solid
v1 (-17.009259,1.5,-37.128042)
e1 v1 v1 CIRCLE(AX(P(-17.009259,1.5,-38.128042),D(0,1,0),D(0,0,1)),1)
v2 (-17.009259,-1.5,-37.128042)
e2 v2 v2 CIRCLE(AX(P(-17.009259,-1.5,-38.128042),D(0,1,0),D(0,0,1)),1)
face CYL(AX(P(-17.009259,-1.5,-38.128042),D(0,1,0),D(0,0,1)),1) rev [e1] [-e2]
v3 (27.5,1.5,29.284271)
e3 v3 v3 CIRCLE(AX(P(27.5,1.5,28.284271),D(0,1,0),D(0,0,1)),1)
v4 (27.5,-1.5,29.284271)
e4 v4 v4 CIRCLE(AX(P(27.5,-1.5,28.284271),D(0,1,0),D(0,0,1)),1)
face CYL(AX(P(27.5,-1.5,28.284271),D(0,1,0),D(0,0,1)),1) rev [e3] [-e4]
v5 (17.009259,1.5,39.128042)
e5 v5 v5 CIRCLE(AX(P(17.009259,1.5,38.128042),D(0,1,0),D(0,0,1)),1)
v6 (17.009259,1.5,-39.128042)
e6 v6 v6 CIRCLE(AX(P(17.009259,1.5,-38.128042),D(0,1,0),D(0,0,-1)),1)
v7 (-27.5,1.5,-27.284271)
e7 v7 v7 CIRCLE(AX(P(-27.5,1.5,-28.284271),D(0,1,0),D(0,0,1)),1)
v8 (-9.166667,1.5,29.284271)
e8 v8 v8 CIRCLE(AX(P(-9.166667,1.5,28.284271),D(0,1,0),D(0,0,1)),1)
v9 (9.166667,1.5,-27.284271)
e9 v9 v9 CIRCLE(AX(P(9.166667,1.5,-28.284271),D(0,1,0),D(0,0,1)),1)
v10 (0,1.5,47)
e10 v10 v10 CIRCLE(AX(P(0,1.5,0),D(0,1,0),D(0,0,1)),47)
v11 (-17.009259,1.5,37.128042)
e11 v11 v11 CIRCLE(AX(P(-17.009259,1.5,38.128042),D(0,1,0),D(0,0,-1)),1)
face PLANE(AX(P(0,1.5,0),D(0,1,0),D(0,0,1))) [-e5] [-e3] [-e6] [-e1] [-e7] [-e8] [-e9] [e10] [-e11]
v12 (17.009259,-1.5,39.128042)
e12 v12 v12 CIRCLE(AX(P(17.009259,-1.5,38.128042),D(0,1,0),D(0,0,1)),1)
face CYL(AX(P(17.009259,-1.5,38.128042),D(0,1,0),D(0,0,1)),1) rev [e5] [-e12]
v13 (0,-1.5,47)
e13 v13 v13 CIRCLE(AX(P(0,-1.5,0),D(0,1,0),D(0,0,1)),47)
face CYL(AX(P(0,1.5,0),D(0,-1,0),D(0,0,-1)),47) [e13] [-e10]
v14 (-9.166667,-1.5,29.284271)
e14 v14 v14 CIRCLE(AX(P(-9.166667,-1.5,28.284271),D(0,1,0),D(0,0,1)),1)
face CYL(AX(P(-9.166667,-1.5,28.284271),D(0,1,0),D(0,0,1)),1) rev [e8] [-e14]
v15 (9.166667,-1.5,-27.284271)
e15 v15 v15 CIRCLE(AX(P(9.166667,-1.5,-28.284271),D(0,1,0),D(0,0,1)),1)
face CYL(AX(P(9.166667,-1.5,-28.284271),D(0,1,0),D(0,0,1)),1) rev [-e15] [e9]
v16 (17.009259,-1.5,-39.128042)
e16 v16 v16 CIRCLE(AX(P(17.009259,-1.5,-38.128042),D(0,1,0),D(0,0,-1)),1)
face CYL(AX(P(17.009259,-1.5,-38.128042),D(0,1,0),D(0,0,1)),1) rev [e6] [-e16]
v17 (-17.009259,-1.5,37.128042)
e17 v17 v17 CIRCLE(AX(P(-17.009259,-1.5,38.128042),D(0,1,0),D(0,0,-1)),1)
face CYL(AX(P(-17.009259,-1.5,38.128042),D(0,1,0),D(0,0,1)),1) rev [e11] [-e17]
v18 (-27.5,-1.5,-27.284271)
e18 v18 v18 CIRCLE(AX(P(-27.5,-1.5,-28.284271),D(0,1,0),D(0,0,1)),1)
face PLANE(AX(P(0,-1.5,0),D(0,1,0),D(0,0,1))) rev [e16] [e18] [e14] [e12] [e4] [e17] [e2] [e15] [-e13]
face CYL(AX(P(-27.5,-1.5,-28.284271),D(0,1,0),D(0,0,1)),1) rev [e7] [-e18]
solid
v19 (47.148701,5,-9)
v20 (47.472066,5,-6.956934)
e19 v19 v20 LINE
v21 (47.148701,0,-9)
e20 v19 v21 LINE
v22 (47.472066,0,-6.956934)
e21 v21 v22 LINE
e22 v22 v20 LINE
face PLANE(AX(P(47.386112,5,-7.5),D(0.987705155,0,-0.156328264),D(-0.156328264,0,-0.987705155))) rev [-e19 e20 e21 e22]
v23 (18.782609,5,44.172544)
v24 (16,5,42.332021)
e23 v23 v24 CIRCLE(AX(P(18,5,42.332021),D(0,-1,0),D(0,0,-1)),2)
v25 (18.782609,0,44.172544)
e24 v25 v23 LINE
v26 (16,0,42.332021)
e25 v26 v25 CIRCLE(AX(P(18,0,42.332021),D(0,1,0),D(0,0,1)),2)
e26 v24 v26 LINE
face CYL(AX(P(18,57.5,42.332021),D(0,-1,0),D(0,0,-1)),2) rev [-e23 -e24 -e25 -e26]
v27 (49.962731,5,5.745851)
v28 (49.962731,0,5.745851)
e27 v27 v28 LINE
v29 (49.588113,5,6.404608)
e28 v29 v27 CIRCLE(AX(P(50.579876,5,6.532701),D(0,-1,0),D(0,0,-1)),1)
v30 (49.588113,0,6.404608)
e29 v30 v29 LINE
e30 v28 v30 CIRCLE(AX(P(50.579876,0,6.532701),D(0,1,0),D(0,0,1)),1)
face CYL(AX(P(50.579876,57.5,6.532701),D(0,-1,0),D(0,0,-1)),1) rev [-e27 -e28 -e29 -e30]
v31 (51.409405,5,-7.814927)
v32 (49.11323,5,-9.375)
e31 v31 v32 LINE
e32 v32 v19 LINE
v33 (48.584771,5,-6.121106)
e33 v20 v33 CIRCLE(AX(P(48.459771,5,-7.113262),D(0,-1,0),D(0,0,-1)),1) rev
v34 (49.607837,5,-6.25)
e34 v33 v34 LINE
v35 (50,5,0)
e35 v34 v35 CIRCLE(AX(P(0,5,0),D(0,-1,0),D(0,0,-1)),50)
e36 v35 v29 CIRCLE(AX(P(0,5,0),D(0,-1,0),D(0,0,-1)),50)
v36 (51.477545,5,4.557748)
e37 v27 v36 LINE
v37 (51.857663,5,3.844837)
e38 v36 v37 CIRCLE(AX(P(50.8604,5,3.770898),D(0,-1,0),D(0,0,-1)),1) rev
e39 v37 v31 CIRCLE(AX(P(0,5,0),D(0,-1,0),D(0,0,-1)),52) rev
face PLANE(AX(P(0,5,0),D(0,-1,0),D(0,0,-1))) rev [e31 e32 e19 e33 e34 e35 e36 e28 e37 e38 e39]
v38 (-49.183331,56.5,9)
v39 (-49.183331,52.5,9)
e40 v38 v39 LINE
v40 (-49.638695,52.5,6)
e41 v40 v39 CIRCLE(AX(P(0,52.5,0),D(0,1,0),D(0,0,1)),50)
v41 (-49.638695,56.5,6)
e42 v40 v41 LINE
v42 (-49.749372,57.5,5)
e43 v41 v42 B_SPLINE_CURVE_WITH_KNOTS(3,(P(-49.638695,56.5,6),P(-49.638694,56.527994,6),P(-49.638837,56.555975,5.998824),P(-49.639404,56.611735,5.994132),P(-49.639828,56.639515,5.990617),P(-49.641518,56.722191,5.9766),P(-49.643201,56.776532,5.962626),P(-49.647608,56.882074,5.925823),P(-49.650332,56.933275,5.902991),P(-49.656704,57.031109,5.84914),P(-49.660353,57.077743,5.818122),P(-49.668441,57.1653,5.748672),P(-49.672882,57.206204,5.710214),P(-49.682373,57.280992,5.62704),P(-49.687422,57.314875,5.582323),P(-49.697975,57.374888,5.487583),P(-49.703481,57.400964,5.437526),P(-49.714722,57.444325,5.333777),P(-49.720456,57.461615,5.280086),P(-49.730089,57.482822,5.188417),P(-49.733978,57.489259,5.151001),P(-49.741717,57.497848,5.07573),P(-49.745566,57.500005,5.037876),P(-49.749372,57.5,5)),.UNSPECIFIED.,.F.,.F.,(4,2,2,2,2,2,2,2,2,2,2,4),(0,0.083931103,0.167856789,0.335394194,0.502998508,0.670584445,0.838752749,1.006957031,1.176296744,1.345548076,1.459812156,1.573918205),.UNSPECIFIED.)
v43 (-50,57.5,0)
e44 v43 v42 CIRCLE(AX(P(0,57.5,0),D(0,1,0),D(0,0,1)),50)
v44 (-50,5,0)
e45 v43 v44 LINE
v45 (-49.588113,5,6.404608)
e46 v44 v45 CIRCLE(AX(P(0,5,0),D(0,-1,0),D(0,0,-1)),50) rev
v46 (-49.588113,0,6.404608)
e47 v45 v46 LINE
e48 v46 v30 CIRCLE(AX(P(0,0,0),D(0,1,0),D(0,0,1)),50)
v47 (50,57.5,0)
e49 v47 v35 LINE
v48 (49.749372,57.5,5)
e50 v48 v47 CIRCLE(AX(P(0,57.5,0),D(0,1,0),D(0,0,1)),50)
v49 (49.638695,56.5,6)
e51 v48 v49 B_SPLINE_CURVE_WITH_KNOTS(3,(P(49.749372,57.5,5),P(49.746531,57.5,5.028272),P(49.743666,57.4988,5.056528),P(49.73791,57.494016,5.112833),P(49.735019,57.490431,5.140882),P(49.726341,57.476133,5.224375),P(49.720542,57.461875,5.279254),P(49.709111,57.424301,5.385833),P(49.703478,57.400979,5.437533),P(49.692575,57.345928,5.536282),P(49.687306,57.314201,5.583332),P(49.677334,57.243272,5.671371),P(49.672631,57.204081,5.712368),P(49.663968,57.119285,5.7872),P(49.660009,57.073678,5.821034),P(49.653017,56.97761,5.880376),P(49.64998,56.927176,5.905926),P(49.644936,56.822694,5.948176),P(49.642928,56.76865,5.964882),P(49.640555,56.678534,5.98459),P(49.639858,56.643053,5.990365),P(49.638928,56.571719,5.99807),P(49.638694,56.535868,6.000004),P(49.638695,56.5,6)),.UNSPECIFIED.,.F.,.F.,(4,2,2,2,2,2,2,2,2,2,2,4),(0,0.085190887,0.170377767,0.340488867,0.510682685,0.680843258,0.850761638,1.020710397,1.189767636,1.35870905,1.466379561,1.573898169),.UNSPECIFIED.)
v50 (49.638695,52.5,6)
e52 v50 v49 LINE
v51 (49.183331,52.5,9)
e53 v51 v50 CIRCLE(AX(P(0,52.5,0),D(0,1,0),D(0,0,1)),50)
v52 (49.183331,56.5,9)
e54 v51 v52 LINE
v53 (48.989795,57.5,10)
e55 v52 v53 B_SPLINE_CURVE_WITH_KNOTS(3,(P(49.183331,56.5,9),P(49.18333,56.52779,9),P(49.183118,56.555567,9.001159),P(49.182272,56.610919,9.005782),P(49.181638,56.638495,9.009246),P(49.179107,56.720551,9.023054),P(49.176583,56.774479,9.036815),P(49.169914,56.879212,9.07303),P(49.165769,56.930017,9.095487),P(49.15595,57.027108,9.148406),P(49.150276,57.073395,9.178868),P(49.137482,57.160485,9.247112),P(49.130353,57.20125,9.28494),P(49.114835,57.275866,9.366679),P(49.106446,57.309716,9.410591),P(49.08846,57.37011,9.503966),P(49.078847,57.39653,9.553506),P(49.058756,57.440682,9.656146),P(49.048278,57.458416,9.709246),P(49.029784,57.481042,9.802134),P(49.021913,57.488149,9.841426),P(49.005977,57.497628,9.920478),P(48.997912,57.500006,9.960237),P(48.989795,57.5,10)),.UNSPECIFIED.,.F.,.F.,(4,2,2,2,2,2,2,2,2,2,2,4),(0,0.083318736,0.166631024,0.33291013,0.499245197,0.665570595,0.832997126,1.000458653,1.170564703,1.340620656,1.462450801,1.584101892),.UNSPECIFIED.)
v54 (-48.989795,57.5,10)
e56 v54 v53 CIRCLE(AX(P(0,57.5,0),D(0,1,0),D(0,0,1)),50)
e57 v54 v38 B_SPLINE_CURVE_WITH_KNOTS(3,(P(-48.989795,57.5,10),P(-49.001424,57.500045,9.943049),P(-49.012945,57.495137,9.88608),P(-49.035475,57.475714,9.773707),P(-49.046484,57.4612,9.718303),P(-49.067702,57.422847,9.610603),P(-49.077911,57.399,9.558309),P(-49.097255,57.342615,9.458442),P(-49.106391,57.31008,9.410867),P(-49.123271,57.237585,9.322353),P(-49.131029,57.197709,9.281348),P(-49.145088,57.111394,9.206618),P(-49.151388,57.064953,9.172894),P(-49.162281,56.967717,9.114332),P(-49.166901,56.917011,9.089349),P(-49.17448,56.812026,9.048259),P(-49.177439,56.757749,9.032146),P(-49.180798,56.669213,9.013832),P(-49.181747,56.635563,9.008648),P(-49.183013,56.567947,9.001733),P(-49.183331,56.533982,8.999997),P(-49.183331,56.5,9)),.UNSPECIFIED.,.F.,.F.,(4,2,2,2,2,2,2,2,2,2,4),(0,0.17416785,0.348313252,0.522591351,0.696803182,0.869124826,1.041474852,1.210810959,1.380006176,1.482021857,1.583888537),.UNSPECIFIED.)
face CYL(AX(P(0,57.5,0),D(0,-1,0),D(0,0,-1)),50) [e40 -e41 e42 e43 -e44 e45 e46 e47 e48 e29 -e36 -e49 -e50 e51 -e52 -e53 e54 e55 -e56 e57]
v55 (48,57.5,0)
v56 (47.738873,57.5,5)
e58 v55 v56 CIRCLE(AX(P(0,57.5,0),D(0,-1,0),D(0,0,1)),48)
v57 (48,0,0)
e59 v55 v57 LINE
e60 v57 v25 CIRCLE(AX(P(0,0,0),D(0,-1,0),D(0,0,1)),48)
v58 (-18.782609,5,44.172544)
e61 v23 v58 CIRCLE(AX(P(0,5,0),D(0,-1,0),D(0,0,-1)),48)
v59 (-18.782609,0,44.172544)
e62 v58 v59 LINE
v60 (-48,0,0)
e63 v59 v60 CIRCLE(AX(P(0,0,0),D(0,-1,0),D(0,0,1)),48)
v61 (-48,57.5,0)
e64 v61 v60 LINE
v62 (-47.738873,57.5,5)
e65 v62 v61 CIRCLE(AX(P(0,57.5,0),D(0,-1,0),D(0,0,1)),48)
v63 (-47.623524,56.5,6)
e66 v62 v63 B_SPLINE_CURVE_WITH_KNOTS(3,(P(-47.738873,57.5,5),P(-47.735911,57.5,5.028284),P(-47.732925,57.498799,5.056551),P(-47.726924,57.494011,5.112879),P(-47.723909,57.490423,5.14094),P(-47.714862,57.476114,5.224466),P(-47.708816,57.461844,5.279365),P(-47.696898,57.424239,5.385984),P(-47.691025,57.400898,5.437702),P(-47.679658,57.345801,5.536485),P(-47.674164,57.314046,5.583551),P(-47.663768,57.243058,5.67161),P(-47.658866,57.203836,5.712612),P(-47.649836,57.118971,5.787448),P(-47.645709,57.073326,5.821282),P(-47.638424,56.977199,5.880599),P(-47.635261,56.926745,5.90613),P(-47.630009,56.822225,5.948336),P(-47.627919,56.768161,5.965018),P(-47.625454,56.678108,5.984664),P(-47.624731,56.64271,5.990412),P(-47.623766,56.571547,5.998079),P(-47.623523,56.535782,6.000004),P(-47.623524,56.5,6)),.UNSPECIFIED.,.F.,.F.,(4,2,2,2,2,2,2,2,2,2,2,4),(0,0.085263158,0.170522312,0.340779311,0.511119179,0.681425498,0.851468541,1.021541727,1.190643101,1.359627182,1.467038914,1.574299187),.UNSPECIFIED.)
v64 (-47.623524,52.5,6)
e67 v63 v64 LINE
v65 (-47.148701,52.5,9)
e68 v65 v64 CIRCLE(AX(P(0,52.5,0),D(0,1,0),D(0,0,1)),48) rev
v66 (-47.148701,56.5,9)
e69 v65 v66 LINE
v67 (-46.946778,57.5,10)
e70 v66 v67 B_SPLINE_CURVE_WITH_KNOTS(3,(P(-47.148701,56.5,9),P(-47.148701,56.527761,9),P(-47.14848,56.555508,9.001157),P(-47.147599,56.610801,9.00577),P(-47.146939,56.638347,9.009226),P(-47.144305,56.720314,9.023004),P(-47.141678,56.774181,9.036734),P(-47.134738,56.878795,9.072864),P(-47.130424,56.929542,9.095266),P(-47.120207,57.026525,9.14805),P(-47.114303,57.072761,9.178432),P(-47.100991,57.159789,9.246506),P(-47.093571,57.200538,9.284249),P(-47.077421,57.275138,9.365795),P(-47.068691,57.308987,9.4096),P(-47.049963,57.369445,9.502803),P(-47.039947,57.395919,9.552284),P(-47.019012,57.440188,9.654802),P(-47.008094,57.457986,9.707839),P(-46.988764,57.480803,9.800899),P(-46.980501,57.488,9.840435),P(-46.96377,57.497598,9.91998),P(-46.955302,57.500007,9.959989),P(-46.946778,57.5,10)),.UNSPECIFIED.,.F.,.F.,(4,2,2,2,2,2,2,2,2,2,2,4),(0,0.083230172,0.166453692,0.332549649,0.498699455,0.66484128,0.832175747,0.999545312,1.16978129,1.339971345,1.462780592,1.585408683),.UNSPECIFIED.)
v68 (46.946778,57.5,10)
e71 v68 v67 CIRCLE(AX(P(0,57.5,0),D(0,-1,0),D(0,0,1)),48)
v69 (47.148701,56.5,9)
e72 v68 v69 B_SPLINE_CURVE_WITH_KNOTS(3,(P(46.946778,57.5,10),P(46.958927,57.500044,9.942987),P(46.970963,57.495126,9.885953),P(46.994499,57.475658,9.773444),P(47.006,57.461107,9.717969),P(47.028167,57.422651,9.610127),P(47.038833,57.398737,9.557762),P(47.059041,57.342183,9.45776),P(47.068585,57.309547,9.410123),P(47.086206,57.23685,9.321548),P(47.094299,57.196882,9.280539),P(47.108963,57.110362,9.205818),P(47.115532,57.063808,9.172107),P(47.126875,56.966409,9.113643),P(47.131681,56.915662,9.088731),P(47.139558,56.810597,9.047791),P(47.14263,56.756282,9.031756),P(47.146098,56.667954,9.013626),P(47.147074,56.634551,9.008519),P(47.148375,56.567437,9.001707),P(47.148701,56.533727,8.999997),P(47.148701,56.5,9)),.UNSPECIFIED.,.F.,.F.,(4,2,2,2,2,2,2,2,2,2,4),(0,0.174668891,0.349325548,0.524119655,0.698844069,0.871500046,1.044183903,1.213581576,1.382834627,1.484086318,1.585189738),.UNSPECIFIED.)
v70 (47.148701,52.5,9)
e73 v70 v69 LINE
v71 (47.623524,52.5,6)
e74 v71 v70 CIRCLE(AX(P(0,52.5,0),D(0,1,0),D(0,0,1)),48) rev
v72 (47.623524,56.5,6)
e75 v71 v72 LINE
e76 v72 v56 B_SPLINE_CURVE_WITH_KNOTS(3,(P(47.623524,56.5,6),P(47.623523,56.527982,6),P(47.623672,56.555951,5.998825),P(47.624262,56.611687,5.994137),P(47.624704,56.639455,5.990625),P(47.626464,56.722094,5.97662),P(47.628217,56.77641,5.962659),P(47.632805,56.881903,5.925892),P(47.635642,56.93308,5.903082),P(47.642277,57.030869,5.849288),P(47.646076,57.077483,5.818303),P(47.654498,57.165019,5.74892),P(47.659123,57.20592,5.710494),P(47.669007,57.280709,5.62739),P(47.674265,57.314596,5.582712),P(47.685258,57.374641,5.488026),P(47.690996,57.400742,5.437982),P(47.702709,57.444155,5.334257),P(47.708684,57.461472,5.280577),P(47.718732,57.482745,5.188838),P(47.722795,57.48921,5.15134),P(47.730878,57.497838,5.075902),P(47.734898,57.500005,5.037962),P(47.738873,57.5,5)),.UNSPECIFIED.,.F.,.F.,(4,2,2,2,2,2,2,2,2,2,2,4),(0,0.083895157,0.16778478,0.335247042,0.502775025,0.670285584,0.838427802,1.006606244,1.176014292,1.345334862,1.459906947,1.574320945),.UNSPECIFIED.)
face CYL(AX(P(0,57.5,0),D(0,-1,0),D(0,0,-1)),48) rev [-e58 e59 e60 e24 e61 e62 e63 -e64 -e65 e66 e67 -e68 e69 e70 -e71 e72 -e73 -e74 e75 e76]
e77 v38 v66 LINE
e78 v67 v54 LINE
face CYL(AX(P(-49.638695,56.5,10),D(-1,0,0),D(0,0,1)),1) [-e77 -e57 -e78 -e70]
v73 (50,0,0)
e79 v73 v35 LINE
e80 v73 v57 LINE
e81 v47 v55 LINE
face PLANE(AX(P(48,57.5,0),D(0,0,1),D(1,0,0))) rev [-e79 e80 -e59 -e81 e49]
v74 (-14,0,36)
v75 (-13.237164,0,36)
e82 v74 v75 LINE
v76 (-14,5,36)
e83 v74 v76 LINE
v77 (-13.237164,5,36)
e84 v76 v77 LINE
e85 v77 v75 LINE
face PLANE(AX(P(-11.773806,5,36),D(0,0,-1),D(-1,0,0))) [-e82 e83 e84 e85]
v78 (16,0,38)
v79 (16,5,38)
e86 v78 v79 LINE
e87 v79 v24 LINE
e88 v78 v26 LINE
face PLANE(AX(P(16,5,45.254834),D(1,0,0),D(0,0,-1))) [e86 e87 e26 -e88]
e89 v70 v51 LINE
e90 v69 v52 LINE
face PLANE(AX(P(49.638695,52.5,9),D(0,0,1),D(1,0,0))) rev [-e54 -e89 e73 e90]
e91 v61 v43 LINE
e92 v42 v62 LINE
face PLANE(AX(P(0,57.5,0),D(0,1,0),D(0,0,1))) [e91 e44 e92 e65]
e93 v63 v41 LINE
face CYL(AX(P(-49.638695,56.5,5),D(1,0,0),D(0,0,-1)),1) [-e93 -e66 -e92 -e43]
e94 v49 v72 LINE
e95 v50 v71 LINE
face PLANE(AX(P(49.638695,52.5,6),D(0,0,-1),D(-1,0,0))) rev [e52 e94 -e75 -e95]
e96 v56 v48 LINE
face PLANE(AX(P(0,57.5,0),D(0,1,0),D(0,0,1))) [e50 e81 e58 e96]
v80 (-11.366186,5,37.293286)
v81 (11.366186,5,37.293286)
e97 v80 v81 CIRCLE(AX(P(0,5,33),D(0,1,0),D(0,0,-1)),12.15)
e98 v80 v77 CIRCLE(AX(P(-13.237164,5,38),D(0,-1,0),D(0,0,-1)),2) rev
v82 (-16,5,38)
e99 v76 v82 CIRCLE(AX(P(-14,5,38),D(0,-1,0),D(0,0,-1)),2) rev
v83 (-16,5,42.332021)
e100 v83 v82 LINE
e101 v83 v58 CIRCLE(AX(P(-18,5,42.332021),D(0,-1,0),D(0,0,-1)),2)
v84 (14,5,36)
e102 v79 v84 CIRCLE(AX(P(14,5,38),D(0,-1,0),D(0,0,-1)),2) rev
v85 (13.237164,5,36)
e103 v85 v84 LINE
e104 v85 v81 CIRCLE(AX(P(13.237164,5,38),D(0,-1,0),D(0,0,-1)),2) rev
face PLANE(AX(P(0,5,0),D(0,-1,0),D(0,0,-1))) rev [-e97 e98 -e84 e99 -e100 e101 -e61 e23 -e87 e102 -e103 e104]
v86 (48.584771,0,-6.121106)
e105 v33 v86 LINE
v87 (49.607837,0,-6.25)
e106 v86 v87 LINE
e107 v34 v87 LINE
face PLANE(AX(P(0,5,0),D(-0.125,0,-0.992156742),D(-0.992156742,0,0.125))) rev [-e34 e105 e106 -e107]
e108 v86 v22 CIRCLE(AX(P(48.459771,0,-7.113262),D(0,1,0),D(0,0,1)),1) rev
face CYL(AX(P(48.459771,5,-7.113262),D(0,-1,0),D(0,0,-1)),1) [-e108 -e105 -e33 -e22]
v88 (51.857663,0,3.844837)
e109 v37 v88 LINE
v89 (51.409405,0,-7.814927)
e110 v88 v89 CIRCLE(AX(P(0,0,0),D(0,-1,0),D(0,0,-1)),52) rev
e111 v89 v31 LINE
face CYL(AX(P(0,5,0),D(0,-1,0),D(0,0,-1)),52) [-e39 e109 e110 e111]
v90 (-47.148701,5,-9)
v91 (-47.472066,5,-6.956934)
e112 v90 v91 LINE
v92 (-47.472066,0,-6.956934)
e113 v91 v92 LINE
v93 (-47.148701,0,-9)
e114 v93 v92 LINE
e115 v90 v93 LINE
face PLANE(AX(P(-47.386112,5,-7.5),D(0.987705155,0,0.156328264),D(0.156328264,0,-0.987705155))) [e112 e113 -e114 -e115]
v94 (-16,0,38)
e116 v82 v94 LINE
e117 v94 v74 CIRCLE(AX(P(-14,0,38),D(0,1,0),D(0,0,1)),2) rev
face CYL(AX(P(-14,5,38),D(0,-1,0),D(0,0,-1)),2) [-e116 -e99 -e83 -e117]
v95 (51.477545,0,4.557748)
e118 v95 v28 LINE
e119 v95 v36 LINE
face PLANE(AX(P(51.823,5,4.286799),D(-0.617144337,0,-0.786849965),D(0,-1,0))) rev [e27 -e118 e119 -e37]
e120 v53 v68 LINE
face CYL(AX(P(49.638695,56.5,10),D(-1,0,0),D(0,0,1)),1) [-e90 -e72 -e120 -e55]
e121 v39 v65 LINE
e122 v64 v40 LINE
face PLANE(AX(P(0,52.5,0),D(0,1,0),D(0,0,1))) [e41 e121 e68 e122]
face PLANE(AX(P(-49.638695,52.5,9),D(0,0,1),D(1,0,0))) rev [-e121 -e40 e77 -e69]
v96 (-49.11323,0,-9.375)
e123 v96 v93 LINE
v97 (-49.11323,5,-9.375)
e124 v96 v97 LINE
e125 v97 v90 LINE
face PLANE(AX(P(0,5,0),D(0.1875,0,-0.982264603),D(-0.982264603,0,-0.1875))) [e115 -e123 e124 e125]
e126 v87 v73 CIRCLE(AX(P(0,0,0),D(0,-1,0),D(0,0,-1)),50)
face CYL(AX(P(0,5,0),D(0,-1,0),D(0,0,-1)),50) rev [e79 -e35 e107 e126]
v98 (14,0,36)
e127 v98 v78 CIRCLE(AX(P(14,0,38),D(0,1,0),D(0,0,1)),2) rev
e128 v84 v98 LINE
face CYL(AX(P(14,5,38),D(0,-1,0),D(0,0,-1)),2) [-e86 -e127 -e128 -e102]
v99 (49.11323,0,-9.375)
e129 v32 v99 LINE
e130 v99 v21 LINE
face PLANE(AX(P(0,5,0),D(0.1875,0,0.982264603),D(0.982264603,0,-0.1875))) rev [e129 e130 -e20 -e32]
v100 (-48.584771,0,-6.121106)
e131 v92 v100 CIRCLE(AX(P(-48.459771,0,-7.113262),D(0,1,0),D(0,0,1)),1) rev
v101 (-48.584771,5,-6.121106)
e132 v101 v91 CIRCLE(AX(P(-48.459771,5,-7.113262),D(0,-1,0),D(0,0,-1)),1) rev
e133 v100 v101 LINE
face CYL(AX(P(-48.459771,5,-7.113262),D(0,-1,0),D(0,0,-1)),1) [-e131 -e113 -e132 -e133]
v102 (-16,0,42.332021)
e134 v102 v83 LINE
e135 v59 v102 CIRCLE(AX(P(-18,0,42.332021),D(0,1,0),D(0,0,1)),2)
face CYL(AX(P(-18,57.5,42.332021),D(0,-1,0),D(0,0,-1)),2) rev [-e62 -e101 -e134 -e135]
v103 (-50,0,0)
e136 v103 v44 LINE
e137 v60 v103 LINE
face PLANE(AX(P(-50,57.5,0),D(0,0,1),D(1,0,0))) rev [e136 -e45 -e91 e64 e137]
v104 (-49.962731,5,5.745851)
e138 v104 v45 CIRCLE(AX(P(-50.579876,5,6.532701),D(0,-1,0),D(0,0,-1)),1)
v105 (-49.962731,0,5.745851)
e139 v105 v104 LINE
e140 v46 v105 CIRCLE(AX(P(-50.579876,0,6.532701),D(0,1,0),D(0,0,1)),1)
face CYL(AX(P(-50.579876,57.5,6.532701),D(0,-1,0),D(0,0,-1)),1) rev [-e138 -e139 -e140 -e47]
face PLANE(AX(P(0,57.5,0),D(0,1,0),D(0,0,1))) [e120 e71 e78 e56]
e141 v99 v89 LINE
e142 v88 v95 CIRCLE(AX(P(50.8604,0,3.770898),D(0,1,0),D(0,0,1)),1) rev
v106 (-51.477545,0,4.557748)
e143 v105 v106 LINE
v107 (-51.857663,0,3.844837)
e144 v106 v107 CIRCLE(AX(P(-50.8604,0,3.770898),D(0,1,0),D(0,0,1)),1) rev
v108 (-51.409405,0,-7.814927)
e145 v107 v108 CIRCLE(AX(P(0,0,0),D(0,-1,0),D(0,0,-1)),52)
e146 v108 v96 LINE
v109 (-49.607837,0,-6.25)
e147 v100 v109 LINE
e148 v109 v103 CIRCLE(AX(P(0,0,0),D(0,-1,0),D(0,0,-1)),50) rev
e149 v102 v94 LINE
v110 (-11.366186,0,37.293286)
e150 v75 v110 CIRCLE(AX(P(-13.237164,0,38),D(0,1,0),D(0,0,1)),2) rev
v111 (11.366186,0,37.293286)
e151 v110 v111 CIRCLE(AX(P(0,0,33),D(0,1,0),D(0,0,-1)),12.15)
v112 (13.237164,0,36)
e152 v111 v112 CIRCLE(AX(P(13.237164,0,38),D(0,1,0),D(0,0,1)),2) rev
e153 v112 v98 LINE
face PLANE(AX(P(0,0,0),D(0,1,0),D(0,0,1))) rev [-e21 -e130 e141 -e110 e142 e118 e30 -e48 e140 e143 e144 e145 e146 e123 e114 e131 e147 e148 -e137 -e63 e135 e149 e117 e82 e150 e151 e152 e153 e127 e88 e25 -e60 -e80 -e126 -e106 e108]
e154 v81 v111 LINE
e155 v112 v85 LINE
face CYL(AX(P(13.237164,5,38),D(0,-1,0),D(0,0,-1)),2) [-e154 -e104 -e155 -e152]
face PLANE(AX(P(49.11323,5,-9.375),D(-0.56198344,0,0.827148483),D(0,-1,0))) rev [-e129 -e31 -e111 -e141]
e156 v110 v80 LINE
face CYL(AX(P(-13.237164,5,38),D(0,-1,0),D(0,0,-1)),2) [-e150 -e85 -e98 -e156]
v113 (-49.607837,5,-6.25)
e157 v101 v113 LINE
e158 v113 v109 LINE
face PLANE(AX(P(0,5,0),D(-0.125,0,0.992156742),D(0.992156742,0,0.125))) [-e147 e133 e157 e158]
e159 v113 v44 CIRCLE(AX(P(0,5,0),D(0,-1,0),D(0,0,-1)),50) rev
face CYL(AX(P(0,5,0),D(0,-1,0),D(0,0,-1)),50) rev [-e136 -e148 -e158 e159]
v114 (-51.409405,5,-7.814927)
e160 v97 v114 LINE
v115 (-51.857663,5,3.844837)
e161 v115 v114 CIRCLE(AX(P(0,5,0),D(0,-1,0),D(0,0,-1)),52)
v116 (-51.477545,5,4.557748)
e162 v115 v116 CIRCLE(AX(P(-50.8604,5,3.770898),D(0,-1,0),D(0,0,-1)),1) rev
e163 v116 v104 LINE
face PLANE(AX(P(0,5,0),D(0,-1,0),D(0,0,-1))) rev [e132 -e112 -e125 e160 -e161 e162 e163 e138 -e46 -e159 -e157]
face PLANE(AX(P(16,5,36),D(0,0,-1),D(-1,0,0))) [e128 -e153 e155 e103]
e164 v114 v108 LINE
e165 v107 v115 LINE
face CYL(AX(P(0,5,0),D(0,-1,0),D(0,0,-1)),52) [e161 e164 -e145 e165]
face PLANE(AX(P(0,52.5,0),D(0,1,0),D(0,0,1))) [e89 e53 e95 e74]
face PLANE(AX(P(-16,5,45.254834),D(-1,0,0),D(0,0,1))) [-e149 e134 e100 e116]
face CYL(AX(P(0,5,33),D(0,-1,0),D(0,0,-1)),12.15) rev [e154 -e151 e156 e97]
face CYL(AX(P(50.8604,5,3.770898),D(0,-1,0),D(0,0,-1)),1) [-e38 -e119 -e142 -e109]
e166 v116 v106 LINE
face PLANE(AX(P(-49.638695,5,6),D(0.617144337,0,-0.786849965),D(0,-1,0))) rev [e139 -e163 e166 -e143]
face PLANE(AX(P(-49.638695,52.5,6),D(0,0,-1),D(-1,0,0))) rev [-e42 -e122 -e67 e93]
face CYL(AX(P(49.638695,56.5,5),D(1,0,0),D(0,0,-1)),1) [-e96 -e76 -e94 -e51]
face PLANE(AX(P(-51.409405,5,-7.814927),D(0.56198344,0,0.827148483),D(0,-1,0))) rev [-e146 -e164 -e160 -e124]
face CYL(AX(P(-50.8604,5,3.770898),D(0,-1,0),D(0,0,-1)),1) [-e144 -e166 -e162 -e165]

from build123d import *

# Parameters (mm, degrees)
A_BASE_T_START         = -1.5
A_BASE_T_OUTLINE_R     = 47
A_BASE_T_OUTLINE_R_2   = 1
A_BASE_T_DEPTH         = 3
SHELL_BODY_DEPTH       = 57.5
SKETCH3_W              = 2.489993647
SKETCH3_H              = 3
CLIP_CAVITY_DEPTH      = 5
CLIP_DEPTH             = 5
TOP_CLAMP_DEPTH        = 5
CLIP_CHAMFER_SIZE      = 2
CONTOURING_R           = 1
INTERFACE_CONTOURING_R = 2


with BuildPart() as part:
    # a_base_t: read off the stored shape, not the designer's step
    # a_base_t outline → a_base_t (new body)
    with BuildSketch(Plane(origin=(0, 0, 0), x_dir=(1, 0, 0), z_dir=(0, 1, 0)).offset(A_BASE_T_START)):
        Circle(A_BASE_T_OUTLINE_R)
        with Locations((-17.009259258, -38.128042167)):
            Circle(A_BASE_T_OUTLINE_R_2, mode=Mode.SUBTRACT)
        with Locations((-9.166666665, -28.284271247)):
            Circle(A_BASE_T_OUTLINE_R_2, mode=Mode.SUBTRACT)
        with Locations((17.009259258, -38.128042167)):
            Circle(A_BASE_T_OUTLINE_R_2, mode=Mode.SUBTRACT)
        with Locations((27.5, -28.284271247)):
            Circle(A_BASE_T_OUTLINE_R_2, mode=Mode.SUBTRACT)
        with Locations((-27.5, 28.284271247)):
            Circle(A_BASE_T_OUTLINE_R_2, mode=Mode.SUBTRACT)
        with Locations((-17.009259258, 38.128042167)):
            Circle(A_BASE_T_OUTLINE_R_2, mode=Mode.SUBTRACT)
        with Locations((9.166666665, 28.284271247)):
            Circle(A_BASE_T_OUTLINE_R_2, mode=Mode.SUBTRACT)
        with Locations((17.009259258, 38.128042167)):
            Circle(A_BASE_T_OUTLINE_R_2, mode=Mode.SUBTRACT)
    extrude(amount=A_BASE_T_DEPTH)


with BuildPart() as body_2:
    # Sketch1 → Shell Body (new body)
    with BuildSketch(Plane(origin=(0, 0, 0), x_dir=(1, 0, 0), z_dir=(0, 1, 0))):
        with BuildLine():
            Line((-50, 0), (-48, 0))
            ThreePointArc((-48, 0), (0, -48), (48, 0))
            Line((48, 0), (50, 0))
            ThreePointArc((50, 0), (0, -50), (-50, 0))
        make_face()
    extrude(amount=SHELL_BODY_DEPTH)

    # Sketch3 → Clip Cavity (cut)
    with BuildSketch(Plane(origin=(0, 57.5, 0), x_dir=(1, 0, 0), z_dir=(0, 1, 0))):
        with Locations((48.393697761, -7.5)):
            Rectangle(SKETCH3_W, SKETCH3_H)
        with Locations((-48.393697761, -7.5)):
            Rectangle(SKETCH3_W, SKETCH3_H)
    extrude(amount=-CLIP_CAVITY_DEPTH, mode=Mode.SUBTRACT)

    # Sketch4 → Clip (add)
    with BuildSketch(Plane.XZ):
        with BuildLine():
            Line((47.148700937, -9), (51.077759348, -9.75))
            ThreePointArc((51.077759348, -9.75), (51.969657629, -1.776143553), (51.624242367, 6.24))
            Line((51.624242367, 6.24), (49.638694584, 6))
            ThreePointArc((49.638694584, 6), (49.90959191, 3.005434312), (50, 0))
            ThreePointArc((50, 0), (49.901862962, -3.131145627), (49.607837082, -6.25))
            Line((49.607837082, -6.25), (47.623523599, -6))
            Line((47.623523599, -6), (47.148700937, -9))
        make_face()
        with BuildLine():
            ThreePointArc((-50, 0), (-49.90959191, 3.005434312), (-49.638694584, 6))
            Line((-49.638694584, 6), (-51.624242367, 6.24))
            ThreePointArc((-51.624242367, 6.24), (-51.969657629, -1.776143553), (-51.077759348, -9.75))
            Line((-51.077759348, -9.75), (-47.148700937, -9))
            Line((-47.148700937, -9), (-47.623523599, -6))
            Line((-47.623523599, -6), (-49.607837082, -6.25))
            ThreePointArc((-49.607837082, -6.25), (-49.901862962, -3.131145627), (-50, 0))
        make_face()
    extrude(amount=-CLIP_DEPTH)

    # Sketch5 → Top Clamp (add)
    with BuildSketch(Plane.XZ):
        with BuildLine():
            Line((16, 45.254833996), (16, 36))
            Line((16, 36), (11.773805672, 36))
            ThreePointArc((11.773805672, 36), (0, 45.15), (-11.773805672, 36))
            Line((-11.773805672, 36), (-16, 36))
            Line((-16, 36), (-16, 45.254833996))
            ThreePointArc((-16, 45.254833996), (0, 48), (16, 45.254833996))
        make_face()
    extrude(amount=-TOP_CLAMP_DEPTH)

    # Clip Chamfer
    # the kernel refuses this chamfer: 2 mm, written as the material it takes off along each edge
    with BuildSketch(Plane(origin=(-51.624242367, -5.143365976, 6.24), x_dir=(0.9927738916792685, 0, -0.11999999999999984), z_dir=(0, 1, 0))) as clip_chamfer_piece_1_section:
        with BuildLine():
            Line((CLIP_CHAMFER_SIZE, 0), (0.037062475, 1.962937525))
            ThreePointArc((0.037062475, 1.962937525), (0.009797411, 1.009373468), (0, 0))
            Line((0, 0), (CLIP_CHAMFER_SIZE, 0))
        make_face()
    clip_chamfer_piece_1 = extrude(amount=15.286731952, mode=Mode.PRIVATE)
    clip_chamfer_piece_1 = clip_chamfer_piece_1 - Plane(origin=(0, -5.143365976, 0), x_dir=(1, 0, 0), z_dir=(0, -1, 0)) * Cylinder(50, 39, mode=Mode.PRIVATE)
    add(clip_chamfer_piece_1, mode=Mode.SUBTRACT)
    with BuildSketch(Plane(origin=(-51.077759348, -5.143365976, -9.75), x_dir=(-0.1689236286537023, 0, 0.9856291430768807), z_dir=(0, 1, 0))) as clip_chamfer_piece_2:
        with BuildLine():
            Line((1.963287385, 0), (CLIP_CHAMFER_SIZE * 0.0188777633164, CLIP_CHAMFER_SIZE * 0.999821799148))
            Line((CLIP_CHAMFER_SIZE * 0.0188777633164, CLIP_CHAMFER_SIZE * 0.999821799148), (0, 0))
            ThreePointArc((0, 0), (1.00937855, -0.009259048), (1.963287385, 0))
        make_face()
    extrude(amount=15.286731952, mode=Mode.SUBTRACT)
    with BuildSketch(Plane(origin=(51.077759348, -5.143365976, -9.75), x_dir=(-0.9822646028438573, 0, 0.18749999999999856), z_dir=(0, 1, 0))) as clip_chamfer_piece_3:
        with BuildLine():
            Line((CLIP_CHAMFER_SIZE, 0), (0.037062475, 1.962937525))
            ThreePointArc((0.037062475, 1.962937525), (0.009797411, 1.009373468), (0, 0))
            Line((0, 0), (CLIP_CHAMFER_SIZE, 0))
        make_face()
    extrude(amount=15.286731952, mode=Mode.SUBTRACT)
    with BuildSketch(Plane(origin=(51.624242367, -5.143365976, 6.24), x_dir=(-0.9927738916792685, 0, -0.12000000000000073), z_dir=(0, 1, 0))) as clip_chamfer_piece_4_section:
        with BuildLine():
            Line((CLIP_CHAMFER_SIZE, 0), (0.037062475, -1.962937525))
            ThreePointArc((0.037062475, -1.962937525), (0.009797411, -1.009373468), (0, 0))
            Line((0, 0), (CLIP_CHAMFER_SIZE, 0))
        make_face()
    clip_chamfer_piece_4 = extrude(amount=15.286731952, mode=Mode.PRIVATE)
    clip_chamfer_piece_4 = clip_chamfer_piece_4 - Plane(origin=(0, -5.143365976, 0), x_dir=(1, 0, 0), z_dir=(0, -1, 0)) * Cylinder(50, 39, mode=Mode.PRIVATE)
    add(clip_chamfer_piece_4, mode=Mode.SUBTRACT)

    # Contouring
    # the kernel refuses this fillet: 1 mm, written as the material it adds along each edge
    with BuildSketch(Plane(origin=(-49.638694584, 0, 6), x_dir=(0.12404711519579938, 0, 0.9922763290594007), z_dir=(0, 1, 0))) as contouring_piece_1:
        with BuildLine():
            CenterArc((0.41183536, -0.999991687), CONTOURING_R, 90.233628647, 44.532742706)
            Line((-0.29238226, -0.290007501), (0, 0))
            ThreePointArc((0, 0), (0.203878891, -0.000415668), (0.407757782, 0))
        make_face()
    extrude(amount=5)
    with BuildSketch(Plane(origin=(49.638694584, 0, 6), x_dir=(-0.12404711519576721, 0, 0.9922763290594048), z_dir=(0, 1, 0))) as contouring_piece_2:
        with BuildLine():
            CenterArc((0.41183536, 0.999991687), CONTOURING_R, 225.233628647, 44.532742706)
            Line((-0.29238226, 0.290007501), (0, 0))
            ThreePointArc((0, 0), (0.203878891, 0.000415668), (0.407757782, 0))
        make_face()
    extrude(amount=5)
    # the kernel refuses this fillet: 1 mm, written as the material it takes off along each edge
    with BuildSketch(Plane(origin=(-51.823000213, -1.108298517, 4.286799377), x_dir=(-0.07818952348583504, 0, -0.9969385128567649), z_dir=(0, 1, 0))) as contouring_2_piece_1:
        with BuildLine():
            CenterArc((0.43905672, -0.999990915), CONTOURING_R, 89.755765309, 47.651830218)
            Line((-0.297130092, -0.323212533), (0, 0))
            ThreePointArc((0, 0), (0.221659703, 0.000472435), (0.443319407, 0))
        make_face()
    extrude(amount=7.216597034, mode=Mode.SUBTRACT)
    with BuildSketch(Plane(origin=(-47.623523599, -2.422115112, -6), x_dir=(-0.9921567416492214, 0, -0.12500000000000036), z_dir=(0, 1, 0))) as contouring_2_piece_2:
        with BuildLine():
            CenterArc((CONTOURING_R * 0.968846044958, -CONTOURING_R), CONTOURING_R, 90, 88.186916453)
            Line((-CONTOURING_R * 0.0306533166715, -CONTOURING_R * 0.968361003452), (0, 0))
            Line((0, 0), (CONTOURING_R * 0.968846044958, 0))
        make_face()
    extrude(amount=9.844230225, mode=Mode.SUBTRACT)
    with BuildSketch(Plane(origin=(47.623523599, -2.422115112, -6), x_dir=(0.9921567416492214, 0, -0.12500000000000036), z_dir=(0, 1, 0))) as contouring_2_piece_3:
        with BuildLine():
            CenterArc((CONTOURING_R * 0.968846044958, CONTOURING_R), CONTOURING_R, 181.813083547, 88.186916453)
            Line((-CONTOURING_R * 0.0306533166715, CONTOURING_R * 0.968361003452), (0, 0))
            Line((0, 0), (CONTOURING_R * 0.968846044958, 0))
        make_face()
    extrude(amount=9.844230225, mode=Mode.SUBTRACT)
    with BuildSketch(Plane(origin=(51.823000213, -1.108298517, 4.286799377), x_dir=(-0.7868499647334531, 0, 0.6171443372493695), z_dir=(0, 1, 0))) as contouring_2_piece_4:
        with BuildLine():
            CenterArc((0.439036027, -1), CONTOURING_R, 90, 47.651830218)
            ThreePointArc((-0.300028991, -0.326365901), (-0.150362296, -0.162863217), (0, 0))
            Line((0, 0), (0.439036027, 0))
        make_face()
    extrude(amount=7.216597034, mode=Mode.SUBTRACT)
    with BuildSketch(Plane(origin=(-52.138694584, 57.5, 6), x_dir=(0, -1, 0), z_dir=(1, 0, 0)), Plane(origin=(52.138694584, 57.5, 6), x_dir=(0, 0, -1), z_dir=(-1, 0, 0))) as contouring_2_piece_5:
        with BuildLine():
            CenterArc((CONTOURING_R, CONTOURING_R), CONTOURING_R, 180, 90)
            Line((0, CONTOURING_R), (0, 0))
            Line((0, 0), (CONTOURING_R, 0))
        make_face()
    extrude(amount=7.015170985, mode=Mode.SUBTRACT)
    with BuildSketch(Plane(origin=(-44.648700937, 57.5, 9), x_dir=(0, 0, 1), z_dir=(-1, 0, 0)), Plane(origin=(44.648700937, 57.5, 9), x_dir=(0, -1, 0), z_dir=(1, 0, 0))) as contouring_2_piece_6:
        with BuildLine():
            CenterArc((CONTOURING_R, -CONTOURING_R), CONTOURING_R, 90, 90)
            Line((0, -CONTOURING_R), (0, 0))
            Line((0, 0), (CONTOURING_R, 0))
        make_face()
    extrude(amount=7.034629573, mode=Mode.SUBTRACT)

    # Interface Contouring
    interface_contouring_edges = [body_2.edges().sort_by_distance(p)[0] for p in [
        (-16, 2.5, 45.254833996),
        (16, 2.5, 45.254833996),
        (16, 2.5, 36),
        (11.773805672, 2.5, 36),
        (-11.773805672, 2.5, 36),
        (-16, 2.5, 36),
    ]]
    fillet(interface_contouring_edges, radius=INTERFACE_CONTOURING_R)


solid = Compound([part.part, body_2.part])
